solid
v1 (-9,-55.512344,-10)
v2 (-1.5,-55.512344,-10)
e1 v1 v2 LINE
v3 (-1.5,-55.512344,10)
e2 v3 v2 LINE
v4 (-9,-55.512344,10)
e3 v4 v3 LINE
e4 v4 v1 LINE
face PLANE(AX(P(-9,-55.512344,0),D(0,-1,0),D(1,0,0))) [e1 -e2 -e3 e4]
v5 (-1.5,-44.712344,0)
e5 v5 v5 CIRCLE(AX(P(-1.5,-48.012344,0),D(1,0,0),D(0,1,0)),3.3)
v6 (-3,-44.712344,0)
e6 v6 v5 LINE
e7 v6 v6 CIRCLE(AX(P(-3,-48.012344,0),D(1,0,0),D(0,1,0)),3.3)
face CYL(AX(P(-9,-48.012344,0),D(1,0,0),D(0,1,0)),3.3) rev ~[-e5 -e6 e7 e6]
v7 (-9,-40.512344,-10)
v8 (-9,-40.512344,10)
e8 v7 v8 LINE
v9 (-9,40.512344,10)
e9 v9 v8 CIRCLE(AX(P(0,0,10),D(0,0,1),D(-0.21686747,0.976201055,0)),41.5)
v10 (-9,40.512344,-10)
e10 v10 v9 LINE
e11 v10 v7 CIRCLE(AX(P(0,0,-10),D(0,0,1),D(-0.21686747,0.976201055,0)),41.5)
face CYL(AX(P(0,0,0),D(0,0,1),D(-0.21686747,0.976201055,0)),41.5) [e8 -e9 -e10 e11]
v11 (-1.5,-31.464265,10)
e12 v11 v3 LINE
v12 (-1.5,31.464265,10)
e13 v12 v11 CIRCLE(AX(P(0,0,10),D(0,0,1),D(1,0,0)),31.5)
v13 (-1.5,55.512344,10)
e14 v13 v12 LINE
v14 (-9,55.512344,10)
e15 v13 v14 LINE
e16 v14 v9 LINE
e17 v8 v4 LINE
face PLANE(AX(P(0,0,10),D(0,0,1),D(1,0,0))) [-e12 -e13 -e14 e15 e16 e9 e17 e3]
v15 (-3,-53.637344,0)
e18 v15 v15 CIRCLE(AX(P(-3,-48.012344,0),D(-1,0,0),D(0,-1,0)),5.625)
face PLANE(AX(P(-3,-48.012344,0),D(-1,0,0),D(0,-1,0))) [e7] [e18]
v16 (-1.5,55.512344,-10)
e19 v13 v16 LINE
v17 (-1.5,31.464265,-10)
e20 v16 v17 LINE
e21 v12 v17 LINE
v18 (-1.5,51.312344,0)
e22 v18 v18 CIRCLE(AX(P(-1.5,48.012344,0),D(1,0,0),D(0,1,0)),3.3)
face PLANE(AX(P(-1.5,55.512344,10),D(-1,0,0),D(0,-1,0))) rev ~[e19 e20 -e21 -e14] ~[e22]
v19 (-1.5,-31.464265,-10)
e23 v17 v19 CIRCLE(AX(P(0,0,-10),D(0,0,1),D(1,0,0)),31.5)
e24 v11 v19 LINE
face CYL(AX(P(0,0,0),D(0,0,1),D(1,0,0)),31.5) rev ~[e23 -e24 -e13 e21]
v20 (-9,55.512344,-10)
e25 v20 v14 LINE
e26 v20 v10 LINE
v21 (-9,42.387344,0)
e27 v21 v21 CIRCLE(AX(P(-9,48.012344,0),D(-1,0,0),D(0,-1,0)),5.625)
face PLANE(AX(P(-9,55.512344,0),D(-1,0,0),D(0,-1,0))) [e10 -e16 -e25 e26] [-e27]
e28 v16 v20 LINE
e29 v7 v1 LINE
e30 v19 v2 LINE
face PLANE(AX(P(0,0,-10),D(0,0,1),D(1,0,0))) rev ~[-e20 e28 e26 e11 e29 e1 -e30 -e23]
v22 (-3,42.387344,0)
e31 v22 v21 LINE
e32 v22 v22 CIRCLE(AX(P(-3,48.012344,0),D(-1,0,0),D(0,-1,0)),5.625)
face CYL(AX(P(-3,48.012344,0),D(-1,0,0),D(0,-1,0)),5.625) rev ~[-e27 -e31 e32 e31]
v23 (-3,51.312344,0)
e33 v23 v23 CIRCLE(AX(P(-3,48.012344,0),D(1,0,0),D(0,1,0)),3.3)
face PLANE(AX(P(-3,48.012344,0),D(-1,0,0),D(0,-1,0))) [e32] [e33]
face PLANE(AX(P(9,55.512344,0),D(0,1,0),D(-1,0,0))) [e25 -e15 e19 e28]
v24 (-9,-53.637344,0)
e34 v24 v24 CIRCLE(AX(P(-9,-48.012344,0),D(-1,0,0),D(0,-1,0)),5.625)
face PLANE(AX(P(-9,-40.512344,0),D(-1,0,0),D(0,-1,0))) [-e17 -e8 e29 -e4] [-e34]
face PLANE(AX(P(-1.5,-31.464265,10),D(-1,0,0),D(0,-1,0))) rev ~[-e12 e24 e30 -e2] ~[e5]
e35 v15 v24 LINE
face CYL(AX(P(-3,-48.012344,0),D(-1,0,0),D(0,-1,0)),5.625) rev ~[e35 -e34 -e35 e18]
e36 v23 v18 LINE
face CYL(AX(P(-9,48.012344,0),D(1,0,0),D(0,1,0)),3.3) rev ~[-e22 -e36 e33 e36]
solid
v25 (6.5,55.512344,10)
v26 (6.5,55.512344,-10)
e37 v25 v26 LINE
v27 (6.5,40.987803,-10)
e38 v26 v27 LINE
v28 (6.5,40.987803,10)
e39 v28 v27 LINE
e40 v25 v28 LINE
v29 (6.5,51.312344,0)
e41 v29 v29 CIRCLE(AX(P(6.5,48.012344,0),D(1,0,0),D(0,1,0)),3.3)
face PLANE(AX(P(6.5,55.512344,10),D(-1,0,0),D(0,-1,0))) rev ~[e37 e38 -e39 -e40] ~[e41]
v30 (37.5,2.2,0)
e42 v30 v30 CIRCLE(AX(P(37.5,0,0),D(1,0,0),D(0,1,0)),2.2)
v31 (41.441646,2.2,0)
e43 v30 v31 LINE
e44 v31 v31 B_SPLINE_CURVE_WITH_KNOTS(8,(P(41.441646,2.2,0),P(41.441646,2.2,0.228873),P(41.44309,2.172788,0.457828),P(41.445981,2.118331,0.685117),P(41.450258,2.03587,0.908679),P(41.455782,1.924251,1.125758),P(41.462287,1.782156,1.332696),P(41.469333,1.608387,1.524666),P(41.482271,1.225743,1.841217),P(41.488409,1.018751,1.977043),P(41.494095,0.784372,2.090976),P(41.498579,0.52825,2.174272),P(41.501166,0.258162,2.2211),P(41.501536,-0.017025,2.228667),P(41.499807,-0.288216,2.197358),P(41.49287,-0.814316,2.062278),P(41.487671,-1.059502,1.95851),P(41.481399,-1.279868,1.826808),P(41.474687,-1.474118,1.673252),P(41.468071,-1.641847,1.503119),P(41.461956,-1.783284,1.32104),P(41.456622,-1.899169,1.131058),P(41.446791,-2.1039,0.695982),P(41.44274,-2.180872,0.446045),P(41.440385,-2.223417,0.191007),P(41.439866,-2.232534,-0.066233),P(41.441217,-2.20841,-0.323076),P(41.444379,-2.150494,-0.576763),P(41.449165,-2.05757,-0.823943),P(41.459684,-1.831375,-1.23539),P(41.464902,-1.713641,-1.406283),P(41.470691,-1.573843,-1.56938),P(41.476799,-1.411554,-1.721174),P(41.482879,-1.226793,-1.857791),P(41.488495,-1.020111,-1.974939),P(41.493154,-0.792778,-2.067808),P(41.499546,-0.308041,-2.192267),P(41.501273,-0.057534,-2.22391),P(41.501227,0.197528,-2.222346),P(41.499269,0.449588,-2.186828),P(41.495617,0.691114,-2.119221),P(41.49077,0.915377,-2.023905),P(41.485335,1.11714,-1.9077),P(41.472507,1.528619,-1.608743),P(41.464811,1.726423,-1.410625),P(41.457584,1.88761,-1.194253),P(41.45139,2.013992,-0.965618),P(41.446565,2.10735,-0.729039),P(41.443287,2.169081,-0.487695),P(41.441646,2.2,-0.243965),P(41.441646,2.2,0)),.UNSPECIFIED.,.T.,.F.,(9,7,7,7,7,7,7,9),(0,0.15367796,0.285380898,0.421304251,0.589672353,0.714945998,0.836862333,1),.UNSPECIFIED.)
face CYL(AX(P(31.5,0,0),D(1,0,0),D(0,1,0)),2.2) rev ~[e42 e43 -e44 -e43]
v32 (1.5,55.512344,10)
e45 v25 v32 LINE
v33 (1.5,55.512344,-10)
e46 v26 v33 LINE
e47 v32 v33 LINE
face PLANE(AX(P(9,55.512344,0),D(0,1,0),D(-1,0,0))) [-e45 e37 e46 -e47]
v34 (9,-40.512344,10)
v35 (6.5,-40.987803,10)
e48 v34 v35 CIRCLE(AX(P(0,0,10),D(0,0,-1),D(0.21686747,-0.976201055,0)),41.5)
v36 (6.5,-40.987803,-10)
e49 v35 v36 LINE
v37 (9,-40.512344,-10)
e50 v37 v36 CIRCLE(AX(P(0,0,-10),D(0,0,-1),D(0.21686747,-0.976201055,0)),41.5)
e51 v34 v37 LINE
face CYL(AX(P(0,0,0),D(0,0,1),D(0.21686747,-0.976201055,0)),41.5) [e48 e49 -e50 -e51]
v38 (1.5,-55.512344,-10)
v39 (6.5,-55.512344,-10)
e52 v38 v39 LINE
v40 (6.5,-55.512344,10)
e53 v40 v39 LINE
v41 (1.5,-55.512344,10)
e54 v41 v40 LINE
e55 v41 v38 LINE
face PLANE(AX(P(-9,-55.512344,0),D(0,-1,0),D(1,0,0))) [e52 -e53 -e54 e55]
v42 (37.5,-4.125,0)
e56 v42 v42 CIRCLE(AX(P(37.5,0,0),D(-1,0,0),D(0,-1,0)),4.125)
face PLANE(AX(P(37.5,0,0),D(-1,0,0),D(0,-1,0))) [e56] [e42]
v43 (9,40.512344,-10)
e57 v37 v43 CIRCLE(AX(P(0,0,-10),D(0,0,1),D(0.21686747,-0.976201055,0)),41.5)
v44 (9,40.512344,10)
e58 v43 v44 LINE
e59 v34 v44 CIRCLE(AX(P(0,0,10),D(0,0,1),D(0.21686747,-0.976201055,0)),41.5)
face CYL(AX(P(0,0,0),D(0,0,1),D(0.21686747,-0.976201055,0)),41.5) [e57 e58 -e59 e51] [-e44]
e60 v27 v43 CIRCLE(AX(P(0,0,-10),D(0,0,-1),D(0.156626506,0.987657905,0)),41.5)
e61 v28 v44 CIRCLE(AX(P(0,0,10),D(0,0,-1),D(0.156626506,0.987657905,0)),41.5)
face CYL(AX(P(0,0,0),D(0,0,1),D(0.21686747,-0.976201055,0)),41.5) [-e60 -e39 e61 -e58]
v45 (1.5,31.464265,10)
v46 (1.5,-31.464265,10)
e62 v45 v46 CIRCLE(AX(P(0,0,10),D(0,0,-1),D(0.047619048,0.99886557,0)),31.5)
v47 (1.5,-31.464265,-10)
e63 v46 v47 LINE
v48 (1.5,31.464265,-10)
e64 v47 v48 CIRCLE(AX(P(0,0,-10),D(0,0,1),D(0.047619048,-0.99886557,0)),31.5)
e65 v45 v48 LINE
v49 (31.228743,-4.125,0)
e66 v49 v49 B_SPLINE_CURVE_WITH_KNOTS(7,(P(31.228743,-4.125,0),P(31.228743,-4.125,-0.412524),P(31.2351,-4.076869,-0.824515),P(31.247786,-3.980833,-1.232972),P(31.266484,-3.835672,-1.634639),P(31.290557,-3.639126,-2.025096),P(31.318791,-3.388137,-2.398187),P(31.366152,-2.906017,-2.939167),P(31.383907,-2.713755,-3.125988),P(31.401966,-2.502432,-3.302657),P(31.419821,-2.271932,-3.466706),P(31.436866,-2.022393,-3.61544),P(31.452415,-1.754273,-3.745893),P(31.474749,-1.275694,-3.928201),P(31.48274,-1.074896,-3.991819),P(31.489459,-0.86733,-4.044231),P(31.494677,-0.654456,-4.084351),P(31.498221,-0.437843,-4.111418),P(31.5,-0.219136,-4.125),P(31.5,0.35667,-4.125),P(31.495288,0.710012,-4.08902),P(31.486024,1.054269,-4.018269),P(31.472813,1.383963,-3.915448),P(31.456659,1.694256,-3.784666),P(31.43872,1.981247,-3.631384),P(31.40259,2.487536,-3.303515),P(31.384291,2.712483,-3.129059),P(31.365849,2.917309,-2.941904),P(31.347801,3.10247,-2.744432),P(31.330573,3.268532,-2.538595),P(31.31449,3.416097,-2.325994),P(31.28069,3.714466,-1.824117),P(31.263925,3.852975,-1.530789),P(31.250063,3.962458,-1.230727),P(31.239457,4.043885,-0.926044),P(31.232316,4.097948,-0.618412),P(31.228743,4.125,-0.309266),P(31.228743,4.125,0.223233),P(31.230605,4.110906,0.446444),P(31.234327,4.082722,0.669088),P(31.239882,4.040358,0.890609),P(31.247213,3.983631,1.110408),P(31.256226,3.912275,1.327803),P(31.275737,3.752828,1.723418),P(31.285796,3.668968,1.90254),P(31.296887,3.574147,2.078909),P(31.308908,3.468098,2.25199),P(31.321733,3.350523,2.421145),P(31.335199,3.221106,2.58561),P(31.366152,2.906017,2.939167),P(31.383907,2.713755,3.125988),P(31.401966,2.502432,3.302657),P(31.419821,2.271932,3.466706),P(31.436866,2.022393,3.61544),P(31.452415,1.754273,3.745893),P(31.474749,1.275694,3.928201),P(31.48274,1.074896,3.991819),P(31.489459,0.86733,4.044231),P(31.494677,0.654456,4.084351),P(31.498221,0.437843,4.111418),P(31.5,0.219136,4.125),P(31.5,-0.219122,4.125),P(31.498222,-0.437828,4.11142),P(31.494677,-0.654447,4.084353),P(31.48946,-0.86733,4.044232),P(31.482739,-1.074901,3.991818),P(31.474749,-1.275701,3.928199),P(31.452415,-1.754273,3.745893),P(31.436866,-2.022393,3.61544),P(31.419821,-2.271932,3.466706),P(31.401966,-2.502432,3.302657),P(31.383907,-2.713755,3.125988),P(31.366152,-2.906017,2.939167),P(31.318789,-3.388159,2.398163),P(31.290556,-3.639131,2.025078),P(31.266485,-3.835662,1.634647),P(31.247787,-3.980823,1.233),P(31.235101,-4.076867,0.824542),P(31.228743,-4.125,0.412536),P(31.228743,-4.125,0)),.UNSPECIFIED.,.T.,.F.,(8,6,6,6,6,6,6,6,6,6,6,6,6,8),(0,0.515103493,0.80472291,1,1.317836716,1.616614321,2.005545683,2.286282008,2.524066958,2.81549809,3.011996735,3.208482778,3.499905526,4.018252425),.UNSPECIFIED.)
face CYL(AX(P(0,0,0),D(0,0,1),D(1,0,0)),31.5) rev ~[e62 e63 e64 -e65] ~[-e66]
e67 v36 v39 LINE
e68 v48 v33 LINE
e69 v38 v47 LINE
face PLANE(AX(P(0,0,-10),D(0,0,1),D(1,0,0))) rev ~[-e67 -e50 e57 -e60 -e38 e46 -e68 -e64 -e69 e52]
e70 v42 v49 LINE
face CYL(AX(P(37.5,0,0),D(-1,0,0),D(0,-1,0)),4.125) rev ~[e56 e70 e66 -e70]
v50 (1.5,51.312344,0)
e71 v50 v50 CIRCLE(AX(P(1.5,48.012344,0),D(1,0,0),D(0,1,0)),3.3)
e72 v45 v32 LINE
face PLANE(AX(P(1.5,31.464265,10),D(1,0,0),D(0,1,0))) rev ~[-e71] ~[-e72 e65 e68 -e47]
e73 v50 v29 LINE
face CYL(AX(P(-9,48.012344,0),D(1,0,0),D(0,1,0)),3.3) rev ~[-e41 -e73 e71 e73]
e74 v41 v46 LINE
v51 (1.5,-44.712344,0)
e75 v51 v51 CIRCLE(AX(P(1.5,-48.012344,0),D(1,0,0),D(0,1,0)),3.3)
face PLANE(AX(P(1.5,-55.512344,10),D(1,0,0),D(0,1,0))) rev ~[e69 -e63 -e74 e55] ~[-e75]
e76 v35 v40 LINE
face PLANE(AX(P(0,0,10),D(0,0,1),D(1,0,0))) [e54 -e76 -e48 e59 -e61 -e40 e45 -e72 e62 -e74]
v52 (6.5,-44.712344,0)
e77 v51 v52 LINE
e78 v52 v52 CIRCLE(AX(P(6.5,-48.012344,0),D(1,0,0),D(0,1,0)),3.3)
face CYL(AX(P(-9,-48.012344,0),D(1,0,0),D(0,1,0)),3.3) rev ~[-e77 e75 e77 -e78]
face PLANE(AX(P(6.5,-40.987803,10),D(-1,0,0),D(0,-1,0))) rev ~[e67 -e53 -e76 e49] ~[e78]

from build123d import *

# Parameters (mm, degrees)
F0_R                 = 31.5
F1_DEPTH             = 10
F1_DEPTH_BACK        = 10
F3_DEPTH             = 20
F6_D                 = 6.6
F6_CBORE_D           = 11.25
F6_CBORE_DEPTH       = 6
F6_ON_F5_D           = 6.6
F6_ON_F5_CBORE_D     = 11.25
F6_ON_F5_CBORE_DEPTH = 6
F11_D                = 4.4
F11_DEPTH            = 14.25
F11_START            = 2.0000001
F11_CBORE_D          = 8.25
F11_CBORE_DEPTH      = 6
F11_TIP              = 1.3218933619


# Not quite as in the source:
# - a feature names something its author has since deleted; it is built from what else it names


with BuildPart() as f1:
    # F0 (on Top) → F1 (new body, two sides)
    with BuildSketch(Plane.XY) as f1_sk:
        with BuildLine():
            ThreePointArc((9, -40.5123437979), (32.3708974235, -25.9687311973), (41.5, 0))
            ThreePointArc((41.5, 0), (32.3708974235, 25.9687311973), (9, 40.5123437979))
            Line((9, 40.5123437979), (-9, 40.5123437979))
            ThreePointArc((-9, 40.5123437979), (-41.5, 0), (-9, -40.5123437979))
            Line((-9, -40.5123437979), (9, -40.5123437979))
        make_face()
        Circle(F0_R, mode=Mode.SUBTRACT)
        with BuildLine():
            ThreePointArc((-9, 40.5123437979), (0, 41.5), (9, 40.5123437979))
            Line((9, 40.5123437979), (9, 55.5123437979))
            Line((9, 55.5123437979), (-9, 55.5123437979))
            Line((-9, 55.5123437979), (-9, 40.5123437979))
        make_face()
        with BuildLine():
            Line((9, -55.5123437979), (9, -40.5123437979))
            ThreePointArc((9, -40.5123437979), (0, -41.5), (-9, -40.5123437979))
            Line((-9, -40.5123437979), (-9, -55.5123437979))
            Line((-9, -55.5123437979), (9, -55.5123437979))
        make_face()
        with BuildLine():
            ThreePointArc((-9, -40.5123437979), (0, -41.5), (9, -40.5123437979))
            Line((9, -40.5123437979), (-9, -40.5123437979))
        make_face()
        with BuildLine():
            Line((-9, 40.5123437979), (9, 40.5123437979))
            ThreePointArc((9, 40.5123437979), (0, 41.5), (-9, 40.5123437979))
        make_face()
    extrude(amount=F1_DEPTH)
    extrude(f1_sk.sketch, amount=-F1_DEPTH_BACK)

    # F2 (on face) → F3 (cut, through all)
    with BuildSketch(Plane.XY.offset(10)):
        with BuildLine():
            ThreePointArc((1.5, -41.4728827067), (0, -41.5), (-1.5, -41.4728827067))
            Line((-1.5, -41.4728827067), (-1.5, -55.5123437979))
            Line((-1.5, -55.5123437979), (1.5, -55.5123437979))
            Line((1.5, -55.5123437979), (1.5, -41.4728827067))
        make_face()
        with BuildLine():
            ThreePointArc((1.5, -31.4642654451), (0, -31.5), (-1.5, -31.4642654451))
            Line((-1.5, -31.4642654451), (-1.5, -41.4728827067))
            ThreePointArc((-1.5, -41.4728827067), (0, -41.5), (1.5, -41.4728827067))
            Line((1.5, -41.4728827067), (1.5, -31.4642654451))
        make_face()
        with BuildLine():
            Line((9, -55.5123437979), (9, -40.5123437979))
            ThreePointArc((9, -40.5123437979), (7.7536452961, -40.7692406677), (6.5, -40.9878030638))
            Line((6.5, -40.9878030638), (6.5, -55.5123437979))
            Line((6.5, -55.5123437979), (9, -55.5123437979))
        make_face()
        with BuildLine():
            Line((1.5, 55.5123437979), (-1.5, 55.5123437979))
            Line((-1.5, 55.5123437979), (-1.5, 41.4728827067))
            ThreePointArc((-1.5, 41.4728827067), (0, 41.5), (1.5, 41.4728827067))
            Line((1.5, 41.4728827067), (1.5, 55.5123437979))
        make_face()
        with BuildLine():
            ThreePointArc((1.5, 41.4728827067), (0, 41.5), (-1.5, 41.4728827067))
            Line((-1.5, 41.4728827067), (-1.5, 31.4642654451))
            ThreePointArc((-1.5, 31.4642654451), (0, 31.5), (1.5, 31.4642654451))
            Line((1.5, 31.4642654451), (1.5, 41.4728827067))
        make_face()
        with BuildLine():
            Line((9, 55.5123437979), (6.5, 55.5123437979))
            Line((6.5, 55.5123437979), (6.5, 40.9878030638))
            ThreePointArc((6.5, 40.9878030638), (7.7536452961, 40.7692406677), (9, 40.5123437979))
            Line((9, 40.5123437979), (9, 55.5123437979))
        make_face()
    extrude(amount=-F3_DEPTH, mode=Mode.SUBTRACT)

    # F6 (through all)
    with Locations(Plane(origin=(-9, 0, 0), x_dir=(0, -1, 0), z_dir=(-1, 0, 0))):
        with Locations((-48.0123437979, 0)):
            CounterBoreHole(F6_D / 2, F6_CBORE_D / 2, F6_CBORE_DEPTH)

    # F6 on F5 (through all)
    with Locations(Plane(origin=(-9, 0, 0), x_dir=(0, -1, 0), z_dir=(-1, 0, 0))):
        with Locations((48.0123437979, 0)):
            CounterBoreHole(F6_ON_F5_D / 2, F6_ON_F5_CBORE_D / 2, F6_ON_F5_CBORE_DEPTH)

    # F11
    # its depths count from where the whole tool has entered the part; down to there all is cleared
    with Locations(Plane(origin=(29.5, 0, 0), x_dir=(0, -1, 0), z_dir=(-1, 0, 0)).offset(-F11_START)):
        with Locations((0, 0)):
            CounterBoreHole(F11_D / 2, F11_CBORE_D / 2, F11_CBORE_DEPTH, depth=F11_DEPTH)
            with Locations((0, 0, -(F11_DEPTH + F11_TIP / 2))):  # 118° drill point
                Cone(0, F11_D / 2, F11_TIP, mode=Mode.SUBTRACT)


solid = f1.part
